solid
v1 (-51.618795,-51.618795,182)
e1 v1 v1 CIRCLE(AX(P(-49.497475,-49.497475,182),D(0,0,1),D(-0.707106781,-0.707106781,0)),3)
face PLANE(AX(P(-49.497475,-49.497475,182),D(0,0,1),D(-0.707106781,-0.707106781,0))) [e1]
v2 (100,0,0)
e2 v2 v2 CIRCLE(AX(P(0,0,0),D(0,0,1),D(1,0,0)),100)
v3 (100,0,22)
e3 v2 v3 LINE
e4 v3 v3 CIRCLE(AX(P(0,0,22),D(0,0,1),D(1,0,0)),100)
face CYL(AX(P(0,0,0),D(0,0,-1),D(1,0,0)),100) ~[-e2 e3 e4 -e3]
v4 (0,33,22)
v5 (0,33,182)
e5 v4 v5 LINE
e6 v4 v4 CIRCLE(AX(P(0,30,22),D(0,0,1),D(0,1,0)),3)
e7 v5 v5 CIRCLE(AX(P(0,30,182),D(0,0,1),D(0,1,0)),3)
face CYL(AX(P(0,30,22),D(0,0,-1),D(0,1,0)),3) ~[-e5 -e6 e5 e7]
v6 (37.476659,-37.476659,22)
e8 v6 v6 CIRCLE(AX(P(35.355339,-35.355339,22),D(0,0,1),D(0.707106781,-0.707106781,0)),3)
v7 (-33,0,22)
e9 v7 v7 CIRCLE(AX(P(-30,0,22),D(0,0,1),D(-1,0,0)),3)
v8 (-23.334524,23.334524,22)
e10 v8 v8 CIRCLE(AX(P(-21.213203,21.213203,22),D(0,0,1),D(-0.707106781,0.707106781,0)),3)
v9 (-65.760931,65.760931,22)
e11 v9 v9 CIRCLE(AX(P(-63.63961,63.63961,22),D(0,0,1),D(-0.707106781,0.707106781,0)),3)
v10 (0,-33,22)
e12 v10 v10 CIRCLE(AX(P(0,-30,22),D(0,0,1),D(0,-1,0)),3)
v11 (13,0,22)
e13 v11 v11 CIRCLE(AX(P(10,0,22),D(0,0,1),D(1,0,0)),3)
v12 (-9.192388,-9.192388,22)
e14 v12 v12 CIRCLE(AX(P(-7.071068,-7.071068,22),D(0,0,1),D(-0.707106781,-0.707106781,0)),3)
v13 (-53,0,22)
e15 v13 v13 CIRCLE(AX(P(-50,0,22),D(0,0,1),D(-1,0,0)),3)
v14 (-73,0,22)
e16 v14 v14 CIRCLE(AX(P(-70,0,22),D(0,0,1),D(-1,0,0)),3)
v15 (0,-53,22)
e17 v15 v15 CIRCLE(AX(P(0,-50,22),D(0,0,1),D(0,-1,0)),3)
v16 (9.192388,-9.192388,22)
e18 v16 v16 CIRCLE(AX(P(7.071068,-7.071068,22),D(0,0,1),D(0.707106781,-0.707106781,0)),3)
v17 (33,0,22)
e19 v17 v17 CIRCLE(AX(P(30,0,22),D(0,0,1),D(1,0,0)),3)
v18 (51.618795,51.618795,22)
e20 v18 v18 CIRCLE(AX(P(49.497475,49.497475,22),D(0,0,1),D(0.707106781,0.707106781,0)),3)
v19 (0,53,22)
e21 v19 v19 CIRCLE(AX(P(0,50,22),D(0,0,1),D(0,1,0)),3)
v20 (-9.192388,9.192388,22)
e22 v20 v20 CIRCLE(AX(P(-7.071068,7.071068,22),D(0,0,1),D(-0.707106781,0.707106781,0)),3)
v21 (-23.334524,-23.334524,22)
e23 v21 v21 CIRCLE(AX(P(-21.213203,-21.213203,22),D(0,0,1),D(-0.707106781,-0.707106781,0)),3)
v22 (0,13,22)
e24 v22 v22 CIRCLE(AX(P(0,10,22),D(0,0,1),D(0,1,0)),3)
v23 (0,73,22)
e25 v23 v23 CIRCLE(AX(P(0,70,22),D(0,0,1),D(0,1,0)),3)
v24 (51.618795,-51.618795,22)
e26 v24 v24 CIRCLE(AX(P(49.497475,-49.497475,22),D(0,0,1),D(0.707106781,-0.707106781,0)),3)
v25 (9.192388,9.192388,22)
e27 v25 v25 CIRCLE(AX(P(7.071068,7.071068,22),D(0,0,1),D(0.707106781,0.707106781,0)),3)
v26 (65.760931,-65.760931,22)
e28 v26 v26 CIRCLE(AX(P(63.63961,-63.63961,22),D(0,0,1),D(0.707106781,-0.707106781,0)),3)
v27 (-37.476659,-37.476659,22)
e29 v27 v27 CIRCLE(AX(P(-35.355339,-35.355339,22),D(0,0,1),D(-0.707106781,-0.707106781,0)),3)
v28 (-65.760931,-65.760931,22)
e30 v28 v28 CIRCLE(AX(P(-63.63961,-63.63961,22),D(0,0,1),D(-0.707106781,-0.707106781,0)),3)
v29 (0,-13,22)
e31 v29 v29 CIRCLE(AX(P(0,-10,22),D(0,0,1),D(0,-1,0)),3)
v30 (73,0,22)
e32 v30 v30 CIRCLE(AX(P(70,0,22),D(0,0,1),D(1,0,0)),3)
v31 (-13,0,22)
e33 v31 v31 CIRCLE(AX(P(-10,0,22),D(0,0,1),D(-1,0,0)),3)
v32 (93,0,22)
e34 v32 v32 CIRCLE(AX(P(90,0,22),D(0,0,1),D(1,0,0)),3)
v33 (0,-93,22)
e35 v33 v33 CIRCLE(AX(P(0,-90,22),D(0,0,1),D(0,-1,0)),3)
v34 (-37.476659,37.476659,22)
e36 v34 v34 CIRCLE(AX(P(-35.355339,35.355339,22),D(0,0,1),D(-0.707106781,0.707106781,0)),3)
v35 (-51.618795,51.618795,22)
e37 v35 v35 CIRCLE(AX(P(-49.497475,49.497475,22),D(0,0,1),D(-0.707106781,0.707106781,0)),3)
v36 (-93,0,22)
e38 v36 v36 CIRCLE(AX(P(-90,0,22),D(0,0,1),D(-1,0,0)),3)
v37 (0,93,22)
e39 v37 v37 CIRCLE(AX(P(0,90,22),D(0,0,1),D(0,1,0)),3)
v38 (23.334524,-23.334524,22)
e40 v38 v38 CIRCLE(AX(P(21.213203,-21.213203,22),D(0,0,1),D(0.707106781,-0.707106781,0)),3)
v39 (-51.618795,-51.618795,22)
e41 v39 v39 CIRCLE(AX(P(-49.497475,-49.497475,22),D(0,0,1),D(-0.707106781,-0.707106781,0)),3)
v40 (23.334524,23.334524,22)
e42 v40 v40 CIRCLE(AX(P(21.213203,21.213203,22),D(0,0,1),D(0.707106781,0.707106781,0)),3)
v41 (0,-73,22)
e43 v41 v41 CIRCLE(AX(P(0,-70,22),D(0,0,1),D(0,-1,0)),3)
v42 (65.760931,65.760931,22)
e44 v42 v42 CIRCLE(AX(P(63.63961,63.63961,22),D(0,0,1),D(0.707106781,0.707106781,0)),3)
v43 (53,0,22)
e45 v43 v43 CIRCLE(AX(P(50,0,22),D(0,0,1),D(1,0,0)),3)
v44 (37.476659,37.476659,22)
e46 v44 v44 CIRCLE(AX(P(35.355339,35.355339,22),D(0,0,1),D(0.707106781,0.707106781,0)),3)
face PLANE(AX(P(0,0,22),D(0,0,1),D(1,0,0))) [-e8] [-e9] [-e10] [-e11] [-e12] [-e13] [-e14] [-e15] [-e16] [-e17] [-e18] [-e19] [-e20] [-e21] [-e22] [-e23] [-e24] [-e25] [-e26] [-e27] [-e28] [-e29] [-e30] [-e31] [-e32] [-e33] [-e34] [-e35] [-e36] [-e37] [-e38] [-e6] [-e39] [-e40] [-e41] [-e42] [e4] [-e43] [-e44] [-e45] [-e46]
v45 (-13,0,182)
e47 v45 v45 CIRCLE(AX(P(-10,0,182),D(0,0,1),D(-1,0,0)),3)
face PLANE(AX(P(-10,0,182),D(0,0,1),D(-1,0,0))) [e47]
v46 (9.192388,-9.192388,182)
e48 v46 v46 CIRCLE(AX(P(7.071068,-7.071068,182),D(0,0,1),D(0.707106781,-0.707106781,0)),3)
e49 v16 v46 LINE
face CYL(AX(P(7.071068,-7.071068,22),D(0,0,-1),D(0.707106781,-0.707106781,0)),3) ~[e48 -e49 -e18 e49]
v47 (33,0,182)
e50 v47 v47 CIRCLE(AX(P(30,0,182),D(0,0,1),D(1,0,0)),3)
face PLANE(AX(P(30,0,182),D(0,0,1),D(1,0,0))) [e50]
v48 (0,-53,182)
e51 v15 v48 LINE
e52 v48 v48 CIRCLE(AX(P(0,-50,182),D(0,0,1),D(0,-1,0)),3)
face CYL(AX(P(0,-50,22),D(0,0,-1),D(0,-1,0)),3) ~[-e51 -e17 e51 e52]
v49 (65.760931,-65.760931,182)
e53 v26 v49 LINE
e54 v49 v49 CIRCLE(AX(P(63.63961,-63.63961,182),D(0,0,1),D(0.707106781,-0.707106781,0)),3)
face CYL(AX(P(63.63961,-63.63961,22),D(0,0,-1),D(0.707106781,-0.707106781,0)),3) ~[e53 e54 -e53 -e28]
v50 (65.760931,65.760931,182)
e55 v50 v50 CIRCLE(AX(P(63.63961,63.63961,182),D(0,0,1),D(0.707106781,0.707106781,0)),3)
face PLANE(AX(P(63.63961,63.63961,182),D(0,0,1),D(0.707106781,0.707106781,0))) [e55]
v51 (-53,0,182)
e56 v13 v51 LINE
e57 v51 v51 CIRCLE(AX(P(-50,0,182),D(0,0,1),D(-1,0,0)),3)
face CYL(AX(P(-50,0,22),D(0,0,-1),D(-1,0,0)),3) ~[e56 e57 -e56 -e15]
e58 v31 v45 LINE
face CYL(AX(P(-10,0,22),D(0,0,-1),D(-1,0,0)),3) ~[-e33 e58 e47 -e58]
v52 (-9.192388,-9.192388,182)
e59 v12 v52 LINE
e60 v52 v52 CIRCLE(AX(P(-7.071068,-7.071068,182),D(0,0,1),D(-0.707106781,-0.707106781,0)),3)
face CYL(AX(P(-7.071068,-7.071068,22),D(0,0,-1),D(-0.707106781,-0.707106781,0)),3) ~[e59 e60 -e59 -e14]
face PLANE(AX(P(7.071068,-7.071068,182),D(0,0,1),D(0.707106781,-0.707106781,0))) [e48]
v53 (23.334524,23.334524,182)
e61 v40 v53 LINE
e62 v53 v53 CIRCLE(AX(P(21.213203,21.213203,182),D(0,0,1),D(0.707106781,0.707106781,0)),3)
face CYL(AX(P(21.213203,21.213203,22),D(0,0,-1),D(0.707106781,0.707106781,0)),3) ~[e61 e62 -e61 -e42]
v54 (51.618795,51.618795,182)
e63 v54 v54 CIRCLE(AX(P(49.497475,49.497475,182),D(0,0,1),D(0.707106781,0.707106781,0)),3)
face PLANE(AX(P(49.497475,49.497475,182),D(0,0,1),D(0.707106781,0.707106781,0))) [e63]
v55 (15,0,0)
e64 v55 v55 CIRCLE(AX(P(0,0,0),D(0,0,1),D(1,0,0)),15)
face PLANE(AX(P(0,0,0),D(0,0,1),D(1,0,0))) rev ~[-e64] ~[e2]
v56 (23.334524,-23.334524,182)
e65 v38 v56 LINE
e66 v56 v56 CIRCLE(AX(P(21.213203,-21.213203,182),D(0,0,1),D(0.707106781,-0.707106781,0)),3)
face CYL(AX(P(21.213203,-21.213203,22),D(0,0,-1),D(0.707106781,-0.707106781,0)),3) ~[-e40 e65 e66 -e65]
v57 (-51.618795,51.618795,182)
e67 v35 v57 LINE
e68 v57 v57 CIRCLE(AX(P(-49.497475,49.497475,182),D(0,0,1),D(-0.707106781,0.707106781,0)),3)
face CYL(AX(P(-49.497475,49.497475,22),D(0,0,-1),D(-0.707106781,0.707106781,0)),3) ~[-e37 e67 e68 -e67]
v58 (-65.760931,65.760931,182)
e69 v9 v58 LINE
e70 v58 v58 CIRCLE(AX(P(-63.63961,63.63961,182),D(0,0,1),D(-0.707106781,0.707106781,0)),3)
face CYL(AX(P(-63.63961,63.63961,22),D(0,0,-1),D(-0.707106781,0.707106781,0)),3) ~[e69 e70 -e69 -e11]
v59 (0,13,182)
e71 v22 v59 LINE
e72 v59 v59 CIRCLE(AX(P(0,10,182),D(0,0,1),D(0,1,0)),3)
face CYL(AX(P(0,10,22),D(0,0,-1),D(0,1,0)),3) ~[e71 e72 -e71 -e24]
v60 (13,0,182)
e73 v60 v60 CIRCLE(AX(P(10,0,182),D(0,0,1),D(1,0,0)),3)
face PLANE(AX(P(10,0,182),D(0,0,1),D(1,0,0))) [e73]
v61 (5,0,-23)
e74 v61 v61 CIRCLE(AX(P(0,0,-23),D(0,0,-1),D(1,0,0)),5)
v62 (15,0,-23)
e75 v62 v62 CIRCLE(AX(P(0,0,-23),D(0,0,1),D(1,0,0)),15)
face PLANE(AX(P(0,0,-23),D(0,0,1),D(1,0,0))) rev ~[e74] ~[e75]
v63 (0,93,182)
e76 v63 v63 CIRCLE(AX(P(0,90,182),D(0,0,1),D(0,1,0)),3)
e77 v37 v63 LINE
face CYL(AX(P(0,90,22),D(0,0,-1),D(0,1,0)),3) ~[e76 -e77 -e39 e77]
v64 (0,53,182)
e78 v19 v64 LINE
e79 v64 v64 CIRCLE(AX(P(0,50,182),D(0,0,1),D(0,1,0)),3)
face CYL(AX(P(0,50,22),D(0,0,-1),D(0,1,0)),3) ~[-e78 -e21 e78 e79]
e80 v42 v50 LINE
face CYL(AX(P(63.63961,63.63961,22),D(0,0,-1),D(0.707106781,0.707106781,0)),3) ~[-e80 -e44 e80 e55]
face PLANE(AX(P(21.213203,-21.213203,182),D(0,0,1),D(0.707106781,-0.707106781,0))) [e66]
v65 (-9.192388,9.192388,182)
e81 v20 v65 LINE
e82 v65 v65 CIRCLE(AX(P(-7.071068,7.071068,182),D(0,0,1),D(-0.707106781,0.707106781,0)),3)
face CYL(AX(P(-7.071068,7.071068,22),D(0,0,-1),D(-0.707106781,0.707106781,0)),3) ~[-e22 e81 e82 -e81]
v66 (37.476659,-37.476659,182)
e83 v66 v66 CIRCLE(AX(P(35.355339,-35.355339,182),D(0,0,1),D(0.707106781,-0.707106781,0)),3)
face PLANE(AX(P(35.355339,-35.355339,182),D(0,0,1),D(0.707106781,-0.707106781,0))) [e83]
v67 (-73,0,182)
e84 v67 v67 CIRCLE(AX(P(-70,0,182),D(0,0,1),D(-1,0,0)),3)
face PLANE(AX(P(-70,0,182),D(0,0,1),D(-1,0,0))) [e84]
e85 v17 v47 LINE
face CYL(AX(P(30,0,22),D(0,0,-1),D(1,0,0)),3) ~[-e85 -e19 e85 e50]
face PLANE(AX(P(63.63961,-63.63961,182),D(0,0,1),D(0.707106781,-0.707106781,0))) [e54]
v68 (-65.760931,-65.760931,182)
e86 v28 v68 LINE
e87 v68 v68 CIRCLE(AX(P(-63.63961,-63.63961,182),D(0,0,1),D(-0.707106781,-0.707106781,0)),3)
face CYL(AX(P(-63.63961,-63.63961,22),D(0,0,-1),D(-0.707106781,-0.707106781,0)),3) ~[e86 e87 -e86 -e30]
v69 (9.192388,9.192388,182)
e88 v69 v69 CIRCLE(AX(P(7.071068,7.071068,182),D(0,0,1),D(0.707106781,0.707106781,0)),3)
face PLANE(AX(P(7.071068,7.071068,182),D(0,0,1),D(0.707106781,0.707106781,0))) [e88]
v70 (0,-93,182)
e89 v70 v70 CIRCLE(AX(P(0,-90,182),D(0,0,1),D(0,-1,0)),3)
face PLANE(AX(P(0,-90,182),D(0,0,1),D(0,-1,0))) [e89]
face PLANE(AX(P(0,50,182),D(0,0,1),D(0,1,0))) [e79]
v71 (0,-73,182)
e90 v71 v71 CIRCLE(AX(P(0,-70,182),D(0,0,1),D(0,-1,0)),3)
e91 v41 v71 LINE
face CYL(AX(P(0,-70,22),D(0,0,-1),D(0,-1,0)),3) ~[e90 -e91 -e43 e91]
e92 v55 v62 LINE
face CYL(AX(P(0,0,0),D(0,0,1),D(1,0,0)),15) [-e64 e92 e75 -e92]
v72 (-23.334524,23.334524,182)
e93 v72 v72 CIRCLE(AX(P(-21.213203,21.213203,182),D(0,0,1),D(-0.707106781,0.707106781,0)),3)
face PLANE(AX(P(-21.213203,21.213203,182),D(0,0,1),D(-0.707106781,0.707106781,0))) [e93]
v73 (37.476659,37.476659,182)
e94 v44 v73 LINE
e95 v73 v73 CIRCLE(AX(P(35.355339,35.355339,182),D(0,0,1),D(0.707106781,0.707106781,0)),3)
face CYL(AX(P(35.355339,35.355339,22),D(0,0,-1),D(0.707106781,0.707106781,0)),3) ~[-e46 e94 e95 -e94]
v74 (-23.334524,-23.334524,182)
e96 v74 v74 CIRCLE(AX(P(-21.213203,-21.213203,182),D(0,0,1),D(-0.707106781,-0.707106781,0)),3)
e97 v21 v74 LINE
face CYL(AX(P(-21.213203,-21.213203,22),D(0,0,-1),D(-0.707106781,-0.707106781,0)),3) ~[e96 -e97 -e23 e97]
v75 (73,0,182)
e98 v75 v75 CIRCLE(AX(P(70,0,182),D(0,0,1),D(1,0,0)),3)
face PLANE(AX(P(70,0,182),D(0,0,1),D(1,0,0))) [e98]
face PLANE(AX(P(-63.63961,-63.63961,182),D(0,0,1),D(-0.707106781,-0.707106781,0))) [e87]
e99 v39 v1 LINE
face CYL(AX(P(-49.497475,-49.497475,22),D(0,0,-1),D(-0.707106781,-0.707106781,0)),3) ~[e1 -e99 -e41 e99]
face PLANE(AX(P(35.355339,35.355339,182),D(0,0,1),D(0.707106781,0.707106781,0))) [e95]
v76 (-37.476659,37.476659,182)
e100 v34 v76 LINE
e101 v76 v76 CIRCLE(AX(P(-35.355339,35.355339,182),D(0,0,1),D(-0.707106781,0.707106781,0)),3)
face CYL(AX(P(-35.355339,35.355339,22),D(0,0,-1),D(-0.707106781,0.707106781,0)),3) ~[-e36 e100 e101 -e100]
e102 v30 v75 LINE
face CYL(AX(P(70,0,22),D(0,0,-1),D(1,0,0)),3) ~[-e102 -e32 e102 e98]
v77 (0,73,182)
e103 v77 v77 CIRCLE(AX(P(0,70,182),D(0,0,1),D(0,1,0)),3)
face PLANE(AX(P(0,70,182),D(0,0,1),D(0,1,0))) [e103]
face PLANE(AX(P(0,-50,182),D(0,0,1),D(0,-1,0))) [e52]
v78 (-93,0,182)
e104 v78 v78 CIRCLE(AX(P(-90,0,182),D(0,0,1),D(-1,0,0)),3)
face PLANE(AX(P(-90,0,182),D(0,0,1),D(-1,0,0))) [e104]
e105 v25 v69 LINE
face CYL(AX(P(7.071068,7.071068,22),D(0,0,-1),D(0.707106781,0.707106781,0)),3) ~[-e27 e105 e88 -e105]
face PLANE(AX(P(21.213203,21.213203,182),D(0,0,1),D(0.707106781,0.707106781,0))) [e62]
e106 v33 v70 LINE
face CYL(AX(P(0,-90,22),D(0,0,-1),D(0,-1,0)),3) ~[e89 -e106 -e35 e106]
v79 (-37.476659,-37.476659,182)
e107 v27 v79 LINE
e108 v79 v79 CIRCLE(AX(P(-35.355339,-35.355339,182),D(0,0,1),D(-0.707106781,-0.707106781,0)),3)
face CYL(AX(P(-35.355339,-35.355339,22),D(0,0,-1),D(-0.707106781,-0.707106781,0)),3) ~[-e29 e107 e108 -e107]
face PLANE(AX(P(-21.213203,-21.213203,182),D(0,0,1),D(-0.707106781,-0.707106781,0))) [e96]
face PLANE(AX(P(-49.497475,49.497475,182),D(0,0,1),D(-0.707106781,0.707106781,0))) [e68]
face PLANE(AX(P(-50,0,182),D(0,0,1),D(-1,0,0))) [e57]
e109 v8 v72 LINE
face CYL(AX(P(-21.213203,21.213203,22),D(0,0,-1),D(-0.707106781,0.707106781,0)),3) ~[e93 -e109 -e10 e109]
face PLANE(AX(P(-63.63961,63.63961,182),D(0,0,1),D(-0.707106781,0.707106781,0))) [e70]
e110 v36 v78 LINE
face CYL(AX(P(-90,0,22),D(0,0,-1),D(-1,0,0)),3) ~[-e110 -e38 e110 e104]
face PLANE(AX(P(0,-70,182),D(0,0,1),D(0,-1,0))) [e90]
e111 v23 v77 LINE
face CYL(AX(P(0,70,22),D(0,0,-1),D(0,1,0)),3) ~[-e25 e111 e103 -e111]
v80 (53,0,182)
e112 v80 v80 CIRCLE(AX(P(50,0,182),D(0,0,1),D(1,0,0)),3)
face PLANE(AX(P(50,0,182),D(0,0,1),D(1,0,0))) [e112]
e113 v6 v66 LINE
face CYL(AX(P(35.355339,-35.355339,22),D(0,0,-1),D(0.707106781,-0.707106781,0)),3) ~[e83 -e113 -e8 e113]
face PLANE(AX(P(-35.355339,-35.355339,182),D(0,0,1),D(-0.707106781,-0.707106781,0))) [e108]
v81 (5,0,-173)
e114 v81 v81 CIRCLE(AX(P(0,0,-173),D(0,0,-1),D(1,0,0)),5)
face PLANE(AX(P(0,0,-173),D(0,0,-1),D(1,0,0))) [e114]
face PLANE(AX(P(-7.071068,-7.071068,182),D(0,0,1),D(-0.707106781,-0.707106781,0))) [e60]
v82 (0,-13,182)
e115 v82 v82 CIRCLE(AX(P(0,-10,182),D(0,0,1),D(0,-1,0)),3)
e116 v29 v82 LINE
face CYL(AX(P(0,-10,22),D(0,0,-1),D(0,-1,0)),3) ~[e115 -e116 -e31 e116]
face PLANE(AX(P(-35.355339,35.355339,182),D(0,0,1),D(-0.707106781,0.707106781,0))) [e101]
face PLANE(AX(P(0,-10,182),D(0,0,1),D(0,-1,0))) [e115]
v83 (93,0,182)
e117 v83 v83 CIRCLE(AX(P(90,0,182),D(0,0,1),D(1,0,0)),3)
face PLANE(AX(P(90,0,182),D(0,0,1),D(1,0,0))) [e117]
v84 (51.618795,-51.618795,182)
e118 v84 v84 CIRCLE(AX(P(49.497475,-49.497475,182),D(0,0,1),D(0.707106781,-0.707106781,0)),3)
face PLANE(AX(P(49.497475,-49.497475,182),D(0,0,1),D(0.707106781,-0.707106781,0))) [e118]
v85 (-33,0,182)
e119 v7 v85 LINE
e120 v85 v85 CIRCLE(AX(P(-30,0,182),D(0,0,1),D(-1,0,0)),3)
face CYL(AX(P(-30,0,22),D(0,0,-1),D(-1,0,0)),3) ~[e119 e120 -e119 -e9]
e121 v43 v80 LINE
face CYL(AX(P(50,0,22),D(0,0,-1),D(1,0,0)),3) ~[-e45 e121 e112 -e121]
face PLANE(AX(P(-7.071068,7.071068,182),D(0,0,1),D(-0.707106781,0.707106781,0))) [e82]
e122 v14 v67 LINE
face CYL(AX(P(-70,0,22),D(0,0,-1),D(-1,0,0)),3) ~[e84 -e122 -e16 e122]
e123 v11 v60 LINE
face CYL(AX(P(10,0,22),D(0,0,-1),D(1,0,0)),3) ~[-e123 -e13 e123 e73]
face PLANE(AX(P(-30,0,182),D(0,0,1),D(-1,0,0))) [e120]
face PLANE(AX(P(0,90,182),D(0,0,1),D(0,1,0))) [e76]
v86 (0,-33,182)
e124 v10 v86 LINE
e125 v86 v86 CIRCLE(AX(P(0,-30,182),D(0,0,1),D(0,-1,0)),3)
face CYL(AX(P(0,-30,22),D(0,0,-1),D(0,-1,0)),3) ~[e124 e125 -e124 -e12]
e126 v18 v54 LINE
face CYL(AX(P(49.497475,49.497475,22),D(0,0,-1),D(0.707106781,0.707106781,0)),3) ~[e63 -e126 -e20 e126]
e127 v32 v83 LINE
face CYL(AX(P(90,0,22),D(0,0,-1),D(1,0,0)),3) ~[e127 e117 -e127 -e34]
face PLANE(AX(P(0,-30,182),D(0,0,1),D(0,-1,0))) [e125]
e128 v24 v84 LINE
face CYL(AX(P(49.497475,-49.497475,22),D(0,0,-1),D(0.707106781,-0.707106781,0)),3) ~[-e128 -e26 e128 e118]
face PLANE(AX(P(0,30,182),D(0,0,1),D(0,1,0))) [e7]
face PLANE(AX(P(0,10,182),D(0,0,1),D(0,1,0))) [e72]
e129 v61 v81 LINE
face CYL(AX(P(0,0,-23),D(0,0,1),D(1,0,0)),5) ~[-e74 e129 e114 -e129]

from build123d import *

# Parameters (mm, degrees)
F0_R            = 100
F1_DEPTH        = 22
F2_R            = 3
F3_DEPTH        = 160
F3_COPIES_COUNT = 8
F4_R            = 15
F5_DEPTH        = 23
F6_R            = 5
F7_DEPTH        = 150


# Not quite as in the source:
# - a pattern or mirror of a feature is missing from the dataset's text; its kind, count and spacing are read off the source's solid


with BuildPart() as f1:
    # F0 (on Top) → F1 (new body)
    with BuildSketch(Plane.XY):
        Circle(F0_R)
    extrude(amount=F1_DEPTH)

    # F2 (on face) → F3 (join)
    with BuildSketch(Plane.XY.offset(22)):
        with Locations((10, 0)):
            Circle(F2_R)
        with Locations((30, 0)):
            Circle(F2_R)
        with Locations((50, 0)):
            Circle(F2_R)
        with Locations((70, 0)):
            Circle(F2_R)
        with Locations((90, 0)):
            Circle(F2_R)
    f3 = extrude(amount=F3_DEPTH)

    # F3_copies: F3 ×8 about axis
    f3_copies_axis = Axis((0, 0, 0), (0, 0, 1))
    for i in range(1, F3_COPIES_COUNT):
        add(f3.rotate(f3_copies_axis, i * 360 / F3_COPIES_COUNT))

    # F4 (on face) → F5 (join)
    with BuildSketch(Plane.XY):
        Circle(F4_R)
    extrude(amount=-F5_DEPTH)

    # F6 (on face) → F7 (join)
    with BuildSketch(Plane(origin=(0, 0, -23), x_dir=(1, 0, 0), z_dir=(0, 0, -1))):
        Circle(F6_R)
    extrude(amount=F7_DEPTH)


solid = f1.part
